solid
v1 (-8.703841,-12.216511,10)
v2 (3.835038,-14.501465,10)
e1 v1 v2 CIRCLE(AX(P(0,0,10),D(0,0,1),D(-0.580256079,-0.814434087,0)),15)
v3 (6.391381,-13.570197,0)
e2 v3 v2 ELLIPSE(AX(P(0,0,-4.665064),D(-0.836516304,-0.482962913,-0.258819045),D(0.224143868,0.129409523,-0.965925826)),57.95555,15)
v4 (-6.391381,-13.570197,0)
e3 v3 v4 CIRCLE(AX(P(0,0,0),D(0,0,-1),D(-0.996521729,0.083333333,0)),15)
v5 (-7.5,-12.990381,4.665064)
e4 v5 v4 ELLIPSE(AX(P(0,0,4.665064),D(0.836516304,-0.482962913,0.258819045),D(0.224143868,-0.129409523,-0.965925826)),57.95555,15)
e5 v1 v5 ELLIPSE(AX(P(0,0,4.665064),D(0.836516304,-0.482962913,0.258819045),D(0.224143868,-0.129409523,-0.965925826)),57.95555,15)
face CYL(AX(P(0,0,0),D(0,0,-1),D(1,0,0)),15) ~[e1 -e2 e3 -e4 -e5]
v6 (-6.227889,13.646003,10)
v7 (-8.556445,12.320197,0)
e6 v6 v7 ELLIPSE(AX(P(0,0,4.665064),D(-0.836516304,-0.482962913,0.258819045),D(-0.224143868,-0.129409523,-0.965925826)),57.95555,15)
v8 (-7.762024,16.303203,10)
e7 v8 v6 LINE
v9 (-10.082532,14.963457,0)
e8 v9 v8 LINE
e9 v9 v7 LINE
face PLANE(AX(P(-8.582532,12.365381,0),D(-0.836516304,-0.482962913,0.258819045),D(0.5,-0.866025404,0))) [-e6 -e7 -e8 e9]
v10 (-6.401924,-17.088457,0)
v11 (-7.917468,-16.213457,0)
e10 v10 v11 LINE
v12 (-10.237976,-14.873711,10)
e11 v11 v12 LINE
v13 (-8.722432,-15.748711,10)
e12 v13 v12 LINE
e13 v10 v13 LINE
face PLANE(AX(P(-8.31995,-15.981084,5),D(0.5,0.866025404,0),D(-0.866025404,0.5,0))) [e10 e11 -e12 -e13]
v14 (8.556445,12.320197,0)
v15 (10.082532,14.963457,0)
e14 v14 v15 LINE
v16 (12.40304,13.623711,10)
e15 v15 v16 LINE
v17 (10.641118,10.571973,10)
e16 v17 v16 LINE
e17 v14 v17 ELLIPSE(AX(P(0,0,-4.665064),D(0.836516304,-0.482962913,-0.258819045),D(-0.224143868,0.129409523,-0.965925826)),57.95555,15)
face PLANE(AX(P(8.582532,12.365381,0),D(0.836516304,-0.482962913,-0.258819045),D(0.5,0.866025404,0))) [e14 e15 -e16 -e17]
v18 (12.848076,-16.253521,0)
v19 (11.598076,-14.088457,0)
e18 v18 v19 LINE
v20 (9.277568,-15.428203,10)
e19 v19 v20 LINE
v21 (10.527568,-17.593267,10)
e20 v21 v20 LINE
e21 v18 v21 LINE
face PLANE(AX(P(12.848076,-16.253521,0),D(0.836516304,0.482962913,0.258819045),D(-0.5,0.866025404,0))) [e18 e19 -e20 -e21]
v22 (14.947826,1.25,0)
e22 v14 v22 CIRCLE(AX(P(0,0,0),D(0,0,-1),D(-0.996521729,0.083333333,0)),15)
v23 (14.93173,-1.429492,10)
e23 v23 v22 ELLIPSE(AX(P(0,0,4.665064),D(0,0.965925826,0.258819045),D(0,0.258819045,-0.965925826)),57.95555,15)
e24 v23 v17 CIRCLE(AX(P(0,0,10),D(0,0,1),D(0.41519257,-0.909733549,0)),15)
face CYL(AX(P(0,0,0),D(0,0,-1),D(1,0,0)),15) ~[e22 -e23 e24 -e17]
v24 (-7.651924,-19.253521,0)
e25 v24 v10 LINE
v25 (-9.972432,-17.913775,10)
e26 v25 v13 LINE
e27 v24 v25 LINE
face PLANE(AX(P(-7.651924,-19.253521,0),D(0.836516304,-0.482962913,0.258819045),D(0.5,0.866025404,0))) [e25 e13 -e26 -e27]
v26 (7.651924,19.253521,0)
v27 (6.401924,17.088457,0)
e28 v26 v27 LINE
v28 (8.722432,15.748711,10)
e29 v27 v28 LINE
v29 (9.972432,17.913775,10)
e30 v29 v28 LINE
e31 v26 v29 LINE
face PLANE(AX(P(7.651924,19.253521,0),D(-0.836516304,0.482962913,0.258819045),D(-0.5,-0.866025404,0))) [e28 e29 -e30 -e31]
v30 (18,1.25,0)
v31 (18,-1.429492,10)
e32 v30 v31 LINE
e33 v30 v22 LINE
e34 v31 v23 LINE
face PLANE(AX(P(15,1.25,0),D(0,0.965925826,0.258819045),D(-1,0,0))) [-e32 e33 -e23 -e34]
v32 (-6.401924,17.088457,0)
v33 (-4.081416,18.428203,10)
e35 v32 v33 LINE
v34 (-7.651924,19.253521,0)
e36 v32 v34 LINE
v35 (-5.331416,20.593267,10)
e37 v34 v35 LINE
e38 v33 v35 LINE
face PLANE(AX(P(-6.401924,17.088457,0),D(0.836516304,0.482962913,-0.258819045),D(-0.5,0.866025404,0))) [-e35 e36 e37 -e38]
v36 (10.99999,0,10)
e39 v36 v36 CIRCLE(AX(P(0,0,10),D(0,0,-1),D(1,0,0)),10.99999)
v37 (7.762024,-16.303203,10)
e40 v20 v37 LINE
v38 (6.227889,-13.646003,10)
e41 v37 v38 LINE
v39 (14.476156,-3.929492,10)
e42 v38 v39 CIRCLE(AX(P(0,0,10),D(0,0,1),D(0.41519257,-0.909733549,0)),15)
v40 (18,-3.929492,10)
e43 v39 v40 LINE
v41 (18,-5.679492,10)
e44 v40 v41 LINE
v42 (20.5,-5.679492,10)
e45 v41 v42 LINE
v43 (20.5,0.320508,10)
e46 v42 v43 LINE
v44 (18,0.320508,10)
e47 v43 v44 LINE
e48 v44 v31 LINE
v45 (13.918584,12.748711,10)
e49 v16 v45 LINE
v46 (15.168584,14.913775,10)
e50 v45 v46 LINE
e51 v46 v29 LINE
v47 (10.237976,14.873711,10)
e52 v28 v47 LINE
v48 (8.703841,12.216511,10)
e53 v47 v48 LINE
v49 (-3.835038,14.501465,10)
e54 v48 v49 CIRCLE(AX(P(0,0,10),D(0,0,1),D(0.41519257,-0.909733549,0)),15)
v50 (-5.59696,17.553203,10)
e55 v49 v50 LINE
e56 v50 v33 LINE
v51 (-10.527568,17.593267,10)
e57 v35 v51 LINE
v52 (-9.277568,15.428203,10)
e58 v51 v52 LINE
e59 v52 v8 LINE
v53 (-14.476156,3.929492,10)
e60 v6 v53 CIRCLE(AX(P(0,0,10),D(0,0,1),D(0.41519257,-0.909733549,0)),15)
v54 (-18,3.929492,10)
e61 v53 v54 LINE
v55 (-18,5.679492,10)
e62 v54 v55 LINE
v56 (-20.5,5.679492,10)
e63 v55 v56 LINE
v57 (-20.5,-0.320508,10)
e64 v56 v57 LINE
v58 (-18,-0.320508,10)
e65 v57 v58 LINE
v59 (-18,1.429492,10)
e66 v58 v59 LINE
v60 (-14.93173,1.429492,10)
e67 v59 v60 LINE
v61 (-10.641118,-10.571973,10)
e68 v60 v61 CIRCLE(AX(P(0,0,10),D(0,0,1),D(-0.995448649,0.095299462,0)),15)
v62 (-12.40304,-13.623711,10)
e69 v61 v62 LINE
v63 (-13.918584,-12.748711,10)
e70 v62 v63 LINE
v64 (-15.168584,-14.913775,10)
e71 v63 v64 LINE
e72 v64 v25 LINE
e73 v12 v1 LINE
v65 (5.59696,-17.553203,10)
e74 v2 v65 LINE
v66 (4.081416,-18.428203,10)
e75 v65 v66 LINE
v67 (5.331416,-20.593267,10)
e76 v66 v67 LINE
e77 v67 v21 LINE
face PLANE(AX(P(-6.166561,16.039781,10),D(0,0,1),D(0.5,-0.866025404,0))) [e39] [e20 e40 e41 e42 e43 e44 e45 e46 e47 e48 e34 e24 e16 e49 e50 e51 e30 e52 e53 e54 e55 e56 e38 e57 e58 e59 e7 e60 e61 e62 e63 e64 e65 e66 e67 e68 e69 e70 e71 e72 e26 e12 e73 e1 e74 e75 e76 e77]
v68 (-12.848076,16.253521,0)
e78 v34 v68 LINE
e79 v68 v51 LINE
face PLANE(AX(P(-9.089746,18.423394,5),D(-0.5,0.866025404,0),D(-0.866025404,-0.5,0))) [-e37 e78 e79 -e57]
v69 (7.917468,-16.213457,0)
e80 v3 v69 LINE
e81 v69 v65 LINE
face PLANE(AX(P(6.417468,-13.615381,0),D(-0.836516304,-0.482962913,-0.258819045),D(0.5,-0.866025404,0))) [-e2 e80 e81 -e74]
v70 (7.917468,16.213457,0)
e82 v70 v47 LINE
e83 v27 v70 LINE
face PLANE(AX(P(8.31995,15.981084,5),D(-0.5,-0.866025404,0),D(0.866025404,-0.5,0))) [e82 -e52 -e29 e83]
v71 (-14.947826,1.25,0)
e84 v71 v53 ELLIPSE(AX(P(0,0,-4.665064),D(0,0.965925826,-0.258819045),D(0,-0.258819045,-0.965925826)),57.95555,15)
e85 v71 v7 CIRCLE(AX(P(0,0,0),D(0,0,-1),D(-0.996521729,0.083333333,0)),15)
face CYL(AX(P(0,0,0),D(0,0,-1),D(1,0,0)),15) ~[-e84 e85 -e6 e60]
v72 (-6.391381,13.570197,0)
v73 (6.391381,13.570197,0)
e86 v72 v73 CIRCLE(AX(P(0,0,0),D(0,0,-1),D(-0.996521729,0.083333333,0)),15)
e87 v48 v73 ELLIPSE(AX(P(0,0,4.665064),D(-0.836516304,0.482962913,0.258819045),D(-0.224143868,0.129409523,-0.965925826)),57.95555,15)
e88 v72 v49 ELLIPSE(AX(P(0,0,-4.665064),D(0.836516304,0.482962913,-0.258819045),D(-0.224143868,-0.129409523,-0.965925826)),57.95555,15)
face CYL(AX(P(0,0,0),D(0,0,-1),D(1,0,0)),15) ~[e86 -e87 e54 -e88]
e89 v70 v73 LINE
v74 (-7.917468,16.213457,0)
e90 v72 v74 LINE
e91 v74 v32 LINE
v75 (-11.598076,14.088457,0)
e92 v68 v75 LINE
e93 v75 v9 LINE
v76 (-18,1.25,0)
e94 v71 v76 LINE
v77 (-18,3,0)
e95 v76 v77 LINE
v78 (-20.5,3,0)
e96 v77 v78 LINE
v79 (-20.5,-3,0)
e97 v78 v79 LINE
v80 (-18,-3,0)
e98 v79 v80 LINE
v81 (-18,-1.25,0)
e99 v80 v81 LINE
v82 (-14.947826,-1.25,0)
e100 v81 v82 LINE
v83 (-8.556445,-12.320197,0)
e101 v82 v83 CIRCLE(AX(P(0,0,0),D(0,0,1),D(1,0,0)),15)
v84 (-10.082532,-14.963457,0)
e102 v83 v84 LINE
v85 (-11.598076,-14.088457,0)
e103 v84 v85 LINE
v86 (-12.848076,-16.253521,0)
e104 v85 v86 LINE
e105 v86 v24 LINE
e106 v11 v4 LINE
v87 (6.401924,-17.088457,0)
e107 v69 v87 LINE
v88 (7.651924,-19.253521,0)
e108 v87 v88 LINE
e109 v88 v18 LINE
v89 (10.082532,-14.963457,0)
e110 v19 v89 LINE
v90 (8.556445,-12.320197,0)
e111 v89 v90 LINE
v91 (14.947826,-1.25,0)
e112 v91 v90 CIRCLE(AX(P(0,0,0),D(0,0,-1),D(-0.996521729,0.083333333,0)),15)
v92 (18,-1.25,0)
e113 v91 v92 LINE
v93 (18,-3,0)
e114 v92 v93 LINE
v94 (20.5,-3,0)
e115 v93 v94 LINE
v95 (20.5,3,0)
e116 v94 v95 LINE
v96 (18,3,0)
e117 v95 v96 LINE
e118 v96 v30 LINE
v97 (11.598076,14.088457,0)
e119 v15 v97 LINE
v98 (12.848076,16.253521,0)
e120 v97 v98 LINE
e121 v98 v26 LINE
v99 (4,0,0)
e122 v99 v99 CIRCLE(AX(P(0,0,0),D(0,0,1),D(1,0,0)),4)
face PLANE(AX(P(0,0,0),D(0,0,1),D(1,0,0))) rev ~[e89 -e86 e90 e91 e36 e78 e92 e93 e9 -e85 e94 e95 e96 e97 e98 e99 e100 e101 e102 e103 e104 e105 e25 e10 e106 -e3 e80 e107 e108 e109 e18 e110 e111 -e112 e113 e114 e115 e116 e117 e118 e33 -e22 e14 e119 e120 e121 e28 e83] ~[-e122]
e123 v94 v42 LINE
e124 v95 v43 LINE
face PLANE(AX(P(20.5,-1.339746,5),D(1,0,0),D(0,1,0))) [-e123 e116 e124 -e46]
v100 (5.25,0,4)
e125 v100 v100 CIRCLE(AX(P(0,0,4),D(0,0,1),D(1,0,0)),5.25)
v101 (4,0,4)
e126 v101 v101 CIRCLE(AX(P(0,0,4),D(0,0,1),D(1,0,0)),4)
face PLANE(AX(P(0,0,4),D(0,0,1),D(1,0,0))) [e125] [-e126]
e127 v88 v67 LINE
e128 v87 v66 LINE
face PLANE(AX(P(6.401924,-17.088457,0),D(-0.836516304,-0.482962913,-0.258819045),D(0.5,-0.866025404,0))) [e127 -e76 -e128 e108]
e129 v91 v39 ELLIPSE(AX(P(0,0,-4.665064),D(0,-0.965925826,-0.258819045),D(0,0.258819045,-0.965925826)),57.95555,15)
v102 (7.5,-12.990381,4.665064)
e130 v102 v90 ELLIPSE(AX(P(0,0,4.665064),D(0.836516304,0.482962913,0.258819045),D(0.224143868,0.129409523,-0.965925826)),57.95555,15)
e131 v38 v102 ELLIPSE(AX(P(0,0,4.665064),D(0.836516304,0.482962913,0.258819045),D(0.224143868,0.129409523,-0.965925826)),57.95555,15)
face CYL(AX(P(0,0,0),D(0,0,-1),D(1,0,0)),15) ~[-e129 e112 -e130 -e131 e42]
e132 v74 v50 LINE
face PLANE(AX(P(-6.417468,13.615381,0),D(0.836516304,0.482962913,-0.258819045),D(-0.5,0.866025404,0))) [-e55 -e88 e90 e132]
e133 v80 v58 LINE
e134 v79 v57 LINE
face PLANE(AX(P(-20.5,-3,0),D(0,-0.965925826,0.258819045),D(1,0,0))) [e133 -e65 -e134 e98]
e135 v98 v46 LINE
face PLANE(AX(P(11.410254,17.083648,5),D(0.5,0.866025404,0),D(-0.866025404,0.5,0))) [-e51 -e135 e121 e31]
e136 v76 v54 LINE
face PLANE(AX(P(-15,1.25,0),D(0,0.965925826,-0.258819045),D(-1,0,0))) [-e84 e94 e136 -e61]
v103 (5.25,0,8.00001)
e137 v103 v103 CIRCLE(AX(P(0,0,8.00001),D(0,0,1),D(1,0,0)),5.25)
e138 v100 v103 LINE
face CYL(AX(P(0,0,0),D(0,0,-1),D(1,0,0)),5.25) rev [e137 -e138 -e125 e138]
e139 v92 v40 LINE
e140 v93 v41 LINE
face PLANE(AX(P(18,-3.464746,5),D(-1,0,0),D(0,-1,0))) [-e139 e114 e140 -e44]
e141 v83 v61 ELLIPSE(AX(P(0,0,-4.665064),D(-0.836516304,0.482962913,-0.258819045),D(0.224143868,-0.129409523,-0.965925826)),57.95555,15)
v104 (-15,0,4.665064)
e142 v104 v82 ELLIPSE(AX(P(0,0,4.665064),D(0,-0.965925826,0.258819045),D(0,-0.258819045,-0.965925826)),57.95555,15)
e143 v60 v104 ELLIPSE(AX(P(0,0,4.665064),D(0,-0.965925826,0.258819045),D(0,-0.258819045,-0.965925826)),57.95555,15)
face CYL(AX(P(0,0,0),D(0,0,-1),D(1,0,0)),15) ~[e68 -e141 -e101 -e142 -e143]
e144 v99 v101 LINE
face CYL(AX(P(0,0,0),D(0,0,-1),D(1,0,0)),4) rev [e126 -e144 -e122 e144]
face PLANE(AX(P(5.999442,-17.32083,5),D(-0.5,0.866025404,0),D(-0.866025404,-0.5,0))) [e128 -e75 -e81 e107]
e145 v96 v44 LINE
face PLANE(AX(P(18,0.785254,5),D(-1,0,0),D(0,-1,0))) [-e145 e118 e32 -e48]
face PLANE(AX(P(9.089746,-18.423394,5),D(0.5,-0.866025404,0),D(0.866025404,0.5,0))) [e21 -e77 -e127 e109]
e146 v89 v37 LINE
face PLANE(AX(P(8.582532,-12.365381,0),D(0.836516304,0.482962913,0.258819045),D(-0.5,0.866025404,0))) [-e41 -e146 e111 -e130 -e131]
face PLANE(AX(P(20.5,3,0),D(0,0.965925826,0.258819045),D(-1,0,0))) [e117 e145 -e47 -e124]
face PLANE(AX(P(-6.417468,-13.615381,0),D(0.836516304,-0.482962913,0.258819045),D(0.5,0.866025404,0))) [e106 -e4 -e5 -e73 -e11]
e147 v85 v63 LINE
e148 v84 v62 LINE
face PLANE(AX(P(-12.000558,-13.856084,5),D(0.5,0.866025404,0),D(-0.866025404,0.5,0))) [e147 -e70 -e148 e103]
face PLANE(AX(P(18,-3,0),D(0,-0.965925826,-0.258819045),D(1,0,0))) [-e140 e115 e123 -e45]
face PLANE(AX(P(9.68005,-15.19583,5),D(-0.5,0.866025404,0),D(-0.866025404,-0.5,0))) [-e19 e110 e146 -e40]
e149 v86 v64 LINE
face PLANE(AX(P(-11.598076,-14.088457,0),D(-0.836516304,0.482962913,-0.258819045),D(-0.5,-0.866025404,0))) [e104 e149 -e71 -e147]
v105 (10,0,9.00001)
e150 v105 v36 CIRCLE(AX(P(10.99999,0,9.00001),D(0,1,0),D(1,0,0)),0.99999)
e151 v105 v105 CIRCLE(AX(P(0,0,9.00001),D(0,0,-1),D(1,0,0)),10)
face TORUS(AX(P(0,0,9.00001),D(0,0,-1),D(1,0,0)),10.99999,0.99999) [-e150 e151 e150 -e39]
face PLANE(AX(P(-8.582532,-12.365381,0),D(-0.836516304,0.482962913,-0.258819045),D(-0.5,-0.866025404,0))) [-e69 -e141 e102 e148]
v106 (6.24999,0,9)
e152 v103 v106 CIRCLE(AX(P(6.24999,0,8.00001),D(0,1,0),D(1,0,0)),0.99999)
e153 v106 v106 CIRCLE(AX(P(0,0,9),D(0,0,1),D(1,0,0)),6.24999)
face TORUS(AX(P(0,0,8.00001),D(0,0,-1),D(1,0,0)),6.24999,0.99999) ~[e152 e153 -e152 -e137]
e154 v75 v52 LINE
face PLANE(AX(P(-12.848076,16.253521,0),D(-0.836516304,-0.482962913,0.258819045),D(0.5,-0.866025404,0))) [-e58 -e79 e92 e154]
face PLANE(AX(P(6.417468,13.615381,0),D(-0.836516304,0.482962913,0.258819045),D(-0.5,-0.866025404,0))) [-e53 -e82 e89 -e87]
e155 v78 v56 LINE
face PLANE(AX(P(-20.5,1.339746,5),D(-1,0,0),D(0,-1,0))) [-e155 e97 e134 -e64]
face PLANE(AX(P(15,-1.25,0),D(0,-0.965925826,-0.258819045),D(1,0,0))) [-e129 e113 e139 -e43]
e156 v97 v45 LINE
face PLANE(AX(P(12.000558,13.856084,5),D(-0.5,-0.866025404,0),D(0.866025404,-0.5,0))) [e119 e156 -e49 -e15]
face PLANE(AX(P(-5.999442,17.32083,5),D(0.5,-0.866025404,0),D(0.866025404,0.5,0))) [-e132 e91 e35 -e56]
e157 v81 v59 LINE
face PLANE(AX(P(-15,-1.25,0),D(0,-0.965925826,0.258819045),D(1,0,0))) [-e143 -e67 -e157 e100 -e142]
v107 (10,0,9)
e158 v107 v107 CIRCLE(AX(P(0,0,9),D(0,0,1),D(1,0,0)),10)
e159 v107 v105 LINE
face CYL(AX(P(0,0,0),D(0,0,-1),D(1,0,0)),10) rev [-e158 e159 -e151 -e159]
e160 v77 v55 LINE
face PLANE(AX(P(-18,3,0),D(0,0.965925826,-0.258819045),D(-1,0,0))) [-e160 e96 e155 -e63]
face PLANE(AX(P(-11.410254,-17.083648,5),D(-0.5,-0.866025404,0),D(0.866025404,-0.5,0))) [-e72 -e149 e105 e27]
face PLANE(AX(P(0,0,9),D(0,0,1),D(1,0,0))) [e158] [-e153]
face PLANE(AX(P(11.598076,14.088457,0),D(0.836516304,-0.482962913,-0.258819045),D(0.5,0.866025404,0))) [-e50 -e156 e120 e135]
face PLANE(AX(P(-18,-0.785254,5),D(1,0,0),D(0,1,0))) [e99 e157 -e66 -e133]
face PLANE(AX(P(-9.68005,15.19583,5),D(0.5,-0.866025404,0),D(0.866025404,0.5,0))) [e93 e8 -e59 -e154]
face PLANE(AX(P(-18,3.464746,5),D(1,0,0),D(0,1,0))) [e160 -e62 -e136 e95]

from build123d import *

# Parameters (mm, degrees)
F0_R      = 15
F0_R_2    = 10
F2_DEPTH  = 10
F1_W      = 6
F1_H      = 2.5
F7_COUNT  = 6
F0_R_3    = 5.25
F0_R_4    = 4
F9_DEPTH  = 4
F10_DEPTH = 9
F11_R     = 0.99999


# Not quite as in the source:
# - a fillet or chamfer is up to 0.001 mm smaller than in the source, because OpenCascade refuses the exact size


with BuildPart() as f2:
    # F0 (on Top) → F2 (new body)
    with BuildSketch(Plane.XY):
        Circle(F0_R)
        Circle(F0_R_2, mode=Mode.SUBTRACT)
    extrude(amount=F2_DEPTH)

    # F6: sweep along a path in F5
    with BuildLine(Plane.YZ.offset(-12)) as f6_path:
        Line((-1.25, 0), (1.4294919243, 10))
    # F1 (on Top) → F6 (sweep)
    with BuildSketch(Plane.XY):
        Polygon((-18, -1.25), (-18, 1.25), (-18, 3), (-20.5, 3), (-20.5, -3), (-18, -3), align=None)
        with Locations((-15, 0)):
            Rectangle(F1_W, F1_H)
    sweep(path=f6_path.line)

    # F7: F2 ×6 about axis
    f7_axis = Axis((0, 0, 0), (0, 0, 1))


with BuildPart() as f2_1:
    add(f2.part)
    for i in range(1, F7_COUNT):
        add(f2.part.rotate(f7_axis, i * 360 / F7_COUNT))



with BuildPart() as f9:
    # F0 (on Top) → F9 (new body)
    with BuildSketch(Plane.XY):
        Circle(F0_R_3)
        Circle(F0_R_4, mode=Mode.SUBTRACT)
    extrude(amount=F9_DEPTH)


with BuildPart() as f2_2:
    add(f2_1.part)

    add(f9.part)  # F10 merges F9
    # F0 (on Top) → F10 (join)
    with BuildSketch(Plane.XY):
        Circle(F0_R_2)
        Circle(F0_R_3, mode=Mode.SUBTRACT)
    extrude(amount=F10_DEPTH)

    # F11 (radius 1 in the source; OpenCascade refuses exactly that, so slightly less here)
    f11_edges = [f2_2.edges().sort_by_distance(p)[0] for p in [
        (-10, 0, 10),
        (-5.25, 0, 9),
    ]]
    fillet(f11_edges, radius=F11_R)


solid = f2_2.part
